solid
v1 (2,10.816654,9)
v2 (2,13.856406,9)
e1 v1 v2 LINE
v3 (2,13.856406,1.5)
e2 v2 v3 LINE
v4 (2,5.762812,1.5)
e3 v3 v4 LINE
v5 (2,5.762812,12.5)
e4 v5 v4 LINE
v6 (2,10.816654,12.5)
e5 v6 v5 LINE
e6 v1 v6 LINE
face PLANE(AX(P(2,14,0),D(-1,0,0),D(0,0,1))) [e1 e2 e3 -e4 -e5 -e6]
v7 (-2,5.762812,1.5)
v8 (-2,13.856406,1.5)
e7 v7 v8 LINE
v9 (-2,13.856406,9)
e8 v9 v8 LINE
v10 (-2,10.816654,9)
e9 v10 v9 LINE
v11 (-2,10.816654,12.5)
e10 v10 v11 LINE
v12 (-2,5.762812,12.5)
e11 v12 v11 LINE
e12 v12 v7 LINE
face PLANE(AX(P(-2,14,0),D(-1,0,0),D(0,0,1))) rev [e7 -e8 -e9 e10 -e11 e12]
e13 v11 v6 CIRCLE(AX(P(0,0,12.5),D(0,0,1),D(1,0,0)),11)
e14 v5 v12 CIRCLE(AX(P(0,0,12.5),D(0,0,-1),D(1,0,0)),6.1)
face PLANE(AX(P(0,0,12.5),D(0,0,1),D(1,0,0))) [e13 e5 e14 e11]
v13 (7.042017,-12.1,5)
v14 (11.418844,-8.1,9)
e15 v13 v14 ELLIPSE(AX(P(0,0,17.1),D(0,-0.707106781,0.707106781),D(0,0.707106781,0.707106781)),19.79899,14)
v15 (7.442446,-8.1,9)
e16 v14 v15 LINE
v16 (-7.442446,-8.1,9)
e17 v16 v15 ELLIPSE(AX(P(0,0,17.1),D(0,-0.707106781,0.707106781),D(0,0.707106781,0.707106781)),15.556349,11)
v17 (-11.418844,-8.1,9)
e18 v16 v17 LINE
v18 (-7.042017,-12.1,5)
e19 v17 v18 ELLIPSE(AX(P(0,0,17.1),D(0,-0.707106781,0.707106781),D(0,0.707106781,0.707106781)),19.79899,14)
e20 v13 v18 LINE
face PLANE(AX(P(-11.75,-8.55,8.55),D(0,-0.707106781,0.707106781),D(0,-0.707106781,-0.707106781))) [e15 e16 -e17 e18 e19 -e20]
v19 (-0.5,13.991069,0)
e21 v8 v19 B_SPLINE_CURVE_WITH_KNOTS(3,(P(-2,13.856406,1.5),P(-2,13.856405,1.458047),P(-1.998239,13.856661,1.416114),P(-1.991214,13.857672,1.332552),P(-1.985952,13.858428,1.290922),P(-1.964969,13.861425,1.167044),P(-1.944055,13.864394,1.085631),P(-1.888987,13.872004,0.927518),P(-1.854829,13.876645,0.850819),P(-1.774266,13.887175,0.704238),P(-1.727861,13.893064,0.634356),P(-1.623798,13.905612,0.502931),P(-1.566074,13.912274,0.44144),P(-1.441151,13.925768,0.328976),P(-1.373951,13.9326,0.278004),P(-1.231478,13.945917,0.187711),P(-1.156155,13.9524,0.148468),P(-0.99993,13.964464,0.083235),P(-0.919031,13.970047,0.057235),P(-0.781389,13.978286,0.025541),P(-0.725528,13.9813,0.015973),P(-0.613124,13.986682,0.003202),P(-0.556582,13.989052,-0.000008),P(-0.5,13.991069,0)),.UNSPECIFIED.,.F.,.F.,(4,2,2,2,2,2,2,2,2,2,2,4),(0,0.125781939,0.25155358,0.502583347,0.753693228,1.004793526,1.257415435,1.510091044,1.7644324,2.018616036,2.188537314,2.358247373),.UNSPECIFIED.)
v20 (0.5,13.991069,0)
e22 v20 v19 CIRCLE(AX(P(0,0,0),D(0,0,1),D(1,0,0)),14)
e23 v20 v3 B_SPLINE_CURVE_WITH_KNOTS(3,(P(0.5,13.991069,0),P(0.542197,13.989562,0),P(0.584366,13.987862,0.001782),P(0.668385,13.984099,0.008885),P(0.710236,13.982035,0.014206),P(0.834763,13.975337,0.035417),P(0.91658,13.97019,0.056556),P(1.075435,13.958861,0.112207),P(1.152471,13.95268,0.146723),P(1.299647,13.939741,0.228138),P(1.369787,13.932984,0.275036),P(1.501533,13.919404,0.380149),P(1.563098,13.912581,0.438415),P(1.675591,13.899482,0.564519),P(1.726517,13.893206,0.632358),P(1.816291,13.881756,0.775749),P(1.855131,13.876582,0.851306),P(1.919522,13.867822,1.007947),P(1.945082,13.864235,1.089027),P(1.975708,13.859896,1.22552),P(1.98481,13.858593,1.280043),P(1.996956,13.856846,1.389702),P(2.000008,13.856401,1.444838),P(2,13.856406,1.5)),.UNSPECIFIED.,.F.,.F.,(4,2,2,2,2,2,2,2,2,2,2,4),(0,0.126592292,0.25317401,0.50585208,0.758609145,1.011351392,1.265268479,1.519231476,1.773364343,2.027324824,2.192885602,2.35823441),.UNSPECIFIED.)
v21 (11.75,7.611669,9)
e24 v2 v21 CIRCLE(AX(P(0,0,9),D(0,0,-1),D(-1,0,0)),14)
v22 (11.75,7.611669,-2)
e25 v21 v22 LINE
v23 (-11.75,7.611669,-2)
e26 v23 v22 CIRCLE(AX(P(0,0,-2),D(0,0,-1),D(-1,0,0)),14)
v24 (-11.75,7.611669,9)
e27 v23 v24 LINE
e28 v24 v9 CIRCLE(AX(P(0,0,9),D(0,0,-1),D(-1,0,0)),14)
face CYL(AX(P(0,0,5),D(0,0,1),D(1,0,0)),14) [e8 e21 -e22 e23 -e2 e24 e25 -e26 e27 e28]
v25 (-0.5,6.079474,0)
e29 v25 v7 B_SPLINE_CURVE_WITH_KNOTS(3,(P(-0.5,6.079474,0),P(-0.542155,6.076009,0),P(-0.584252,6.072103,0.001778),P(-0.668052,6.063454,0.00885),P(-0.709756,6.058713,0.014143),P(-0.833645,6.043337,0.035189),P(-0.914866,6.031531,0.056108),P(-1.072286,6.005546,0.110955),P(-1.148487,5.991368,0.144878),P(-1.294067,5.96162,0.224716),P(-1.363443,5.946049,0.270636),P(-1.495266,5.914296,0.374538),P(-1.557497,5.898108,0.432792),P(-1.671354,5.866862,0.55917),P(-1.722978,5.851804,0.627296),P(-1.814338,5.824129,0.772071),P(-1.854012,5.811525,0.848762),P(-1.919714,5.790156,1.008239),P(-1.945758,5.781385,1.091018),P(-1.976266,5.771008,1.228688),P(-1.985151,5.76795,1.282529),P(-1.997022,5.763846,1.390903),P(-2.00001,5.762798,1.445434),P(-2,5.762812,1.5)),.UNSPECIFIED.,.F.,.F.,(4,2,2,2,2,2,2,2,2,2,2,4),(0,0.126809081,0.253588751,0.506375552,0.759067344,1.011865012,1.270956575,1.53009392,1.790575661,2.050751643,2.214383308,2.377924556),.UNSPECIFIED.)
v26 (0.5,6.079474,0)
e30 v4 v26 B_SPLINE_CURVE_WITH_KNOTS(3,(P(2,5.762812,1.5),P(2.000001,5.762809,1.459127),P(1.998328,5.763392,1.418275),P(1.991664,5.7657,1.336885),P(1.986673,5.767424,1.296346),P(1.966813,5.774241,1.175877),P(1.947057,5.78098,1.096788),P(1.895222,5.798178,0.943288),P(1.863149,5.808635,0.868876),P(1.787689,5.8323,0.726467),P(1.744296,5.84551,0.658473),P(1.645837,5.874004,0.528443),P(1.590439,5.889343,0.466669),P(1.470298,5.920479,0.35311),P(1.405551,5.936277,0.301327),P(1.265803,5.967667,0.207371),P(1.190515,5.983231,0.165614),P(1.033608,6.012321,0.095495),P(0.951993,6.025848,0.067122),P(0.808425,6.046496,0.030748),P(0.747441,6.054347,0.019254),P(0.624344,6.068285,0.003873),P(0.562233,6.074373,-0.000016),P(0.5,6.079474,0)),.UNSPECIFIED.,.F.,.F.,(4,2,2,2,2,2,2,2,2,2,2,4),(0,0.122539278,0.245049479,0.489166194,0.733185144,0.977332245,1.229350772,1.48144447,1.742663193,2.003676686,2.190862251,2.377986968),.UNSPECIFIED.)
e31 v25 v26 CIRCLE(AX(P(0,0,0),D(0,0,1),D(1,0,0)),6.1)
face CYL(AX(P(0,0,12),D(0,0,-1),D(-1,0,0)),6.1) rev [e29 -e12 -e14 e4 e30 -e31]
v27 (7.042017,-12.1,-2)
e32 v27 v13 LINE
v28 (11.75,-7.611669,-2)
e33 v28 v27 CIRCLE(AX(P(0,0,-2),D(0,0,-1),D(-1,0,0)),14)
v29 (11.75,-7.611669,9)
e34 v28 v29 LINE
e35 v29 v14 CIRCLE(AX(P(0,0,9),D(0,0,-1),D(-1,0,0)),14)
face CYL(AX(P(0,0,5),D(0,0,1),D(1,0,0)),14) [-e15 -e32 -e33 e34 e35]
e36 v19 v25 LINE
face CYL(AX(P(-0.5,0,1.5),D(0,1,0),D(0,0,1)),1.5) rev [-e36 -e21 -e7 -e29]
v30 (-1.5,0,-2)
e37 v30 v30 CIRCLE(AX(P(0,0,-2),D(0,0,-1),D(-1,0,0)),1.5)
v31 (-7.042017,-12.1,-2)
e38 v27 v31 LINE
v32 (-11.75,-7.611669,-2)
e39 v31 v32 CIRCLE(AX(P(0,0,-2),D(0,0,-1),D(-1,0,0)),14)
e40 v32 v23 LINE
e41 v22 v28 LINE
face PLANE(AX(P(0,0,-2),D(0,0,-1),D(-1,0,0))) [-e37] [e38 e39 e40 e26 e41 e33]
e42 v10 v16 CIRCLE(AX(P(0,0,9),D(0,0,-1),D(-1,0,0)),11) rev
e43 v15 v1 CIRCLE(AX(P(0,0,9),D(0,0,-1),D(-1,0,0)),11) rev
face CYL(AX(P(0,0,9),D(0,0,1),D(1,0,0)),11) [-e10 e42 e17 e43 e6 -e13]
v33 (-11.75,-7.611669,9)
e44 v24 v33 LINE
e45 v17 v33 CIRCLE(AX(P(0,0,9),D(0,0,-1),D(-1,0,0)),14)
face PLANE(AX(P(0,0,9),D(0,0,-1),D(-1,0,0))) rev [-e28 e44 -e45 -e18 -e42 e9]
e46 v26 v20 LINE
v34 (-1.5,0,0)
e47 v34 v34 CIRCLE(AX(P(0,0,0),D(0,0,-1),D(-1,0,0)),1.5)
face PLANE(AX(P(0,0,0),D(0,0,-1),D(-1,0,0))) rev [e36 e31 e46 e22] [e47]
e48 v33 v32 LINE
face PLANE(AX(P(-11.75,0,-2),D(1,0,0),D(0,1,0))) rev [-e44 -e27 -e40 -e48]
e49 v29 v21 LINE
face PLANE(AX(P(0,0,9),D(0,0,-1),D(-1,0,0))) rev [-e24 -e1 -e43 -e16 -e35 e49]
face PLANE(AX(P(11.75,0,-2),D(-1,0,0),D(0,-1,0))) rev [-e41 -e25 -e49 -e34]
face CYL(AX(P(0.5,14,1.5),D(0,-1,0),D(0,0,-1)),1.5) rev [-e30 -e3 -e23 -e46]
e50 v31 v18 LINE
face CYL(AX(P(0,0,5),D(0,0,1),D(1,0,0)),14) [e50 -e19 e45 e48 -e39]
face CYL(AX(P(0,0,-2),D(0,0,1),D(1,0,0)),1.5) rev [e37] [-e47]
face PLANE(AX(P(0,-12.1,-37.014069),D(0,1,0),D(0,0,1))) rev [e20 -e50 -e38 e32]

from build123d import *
from build123d.topology import SkipClean

# Parameters (mm, degrees)
SKETCH1_R               = 9.1
SKETCH1_R_2             = 6.1
BOSS_EXTRUDE1_DEPTH     = 12
BOSS_EXTRUDE2_START     = -3
SKETCH2_R               = 11
SKETCH2_R_2             = 9.1
BOSS_EXTRUDE2_DEPTH     = 3
BOSS_EXTRUDE3_START     = 4
SKETCH3_R               = 14
SKETCH3_R_2             = 11
SKETCH3_R_3             = 9.1
BOSS_EXTRUDE3_DEPTH     = 4
BOSS_EXTRUDE4_START     = 2
SKETCH4_R               = 9.1
SKETCH4_R_2             = 1.5
BOSS_EXTRUDE4_DEPTH     = 2
CUT_EXTRUDE3_DEPTH      = 23.649503306
CUT_EXTRUDE3_DEPTH_BACK = 23.649503306
SKETCH5_W               = 4
SKETCH5_H               = 12
CUT_EXTRUDE1_DEPTH      = 22.864640404
CUT_EXTRUDE4_DEPTH      = 22.864640404
CUT_EXTRUDE4_DEPTH_BACK = 22.864640404
SKETCH7_W               = 8
SKETCH7_H               = 10
BOSS_EXTRUDE5_START     = -14
SKETCH2_2_R             = 11
SKETCH2_2_R_2           = 9.1
SKETCH2_2_R_3           = 6.1
BOSS_EXTRUDE5_DEPTH     = 14
BOSS_EXTRUDE6_START     = 7
BOSS_EXTRUDE6_DEPTH     = 7
CUT_EXTRUDE5_START      = 5.762811814
CUT_EXTRUDE5_OUTLINE_W  = 4
CUT_EXTRUDE5_OUTLINE_H  = 12
CUT_EXTRUDE5_DEPTH      = 5.237188186
BOSS_EXTRUDE7_START     = -2
SKETCH11_R              = 14
SKETCH11_R_2            = 1.5
BOSS_EXTRUDE7_DEPTH     = 2
CUT_EXTRUDE6_DEPTH      = 24.151673806
CUT_EXTRUDE6_DEPTH_BACK = 24.151673806
FILLET1_R               = 1.5
BOSS_EXTRUDE8_DEPTH     = 0.5


# Read off the part's stored shape, not the designer's step: Cut-Extrude5
with BuildPart() as part:
    # Sketch1 → Boss-Extrude1 (new body)
    with BuildSketch(Plane.XY):
        Circle(SKETCH1_R)
        Circle(SKETCH1_R_2, mode=Mode.SUBTRACT)
    extrude(amount=BOSS_EXTRUDE1_DEPTH)

    # Sketch2 → Boss-Extrude2 (add)
    with BuildSketch(Plane.XY.offset(12).offset(BOSS_EXTRUDE2_START)):
        Circle(SKETCH2_R)
        Circle(SKETCH2_R_2, mode=Mode.SUBTRACT)
    extrude(amount=BOSS_EXTRUDE2_DEPTH)

    # Sketch3 → Boss-Extrude3 (add)
    # profile 1 of 2: a face of its own
    with BuildSketch(Plane(origin=(0, 0, 9), x_dir=(-1, 0, 0), z_dir=(0, 0, -1)).offset(BOSS_EXTRUDE3_START)):
        Circle(SKETCH3_R)
        with Locations(Location((0, 0, 0), (0, 0, 180))):
            Circle(SKETCH3_R_2, mode=Mode.SUBTRACT)
    # profile 2 of 2: a face of its own
    with BuildSketch(Plane(origin=(0, 0, 9), x_dir=(-1, 0, 0), z_dir=(0, 0, -1)).offset(BOSS_EXTRUDE3_START)):
        with Locations(Location((0, 0, 0), (0, 0, 180))):
            Circle(SKETCH3_R_2)
        Circle(SKETCH3_R_3, mode=Mode.SUBTRACT)
    extrude(amount=-BOSS_EXTRUDE3_DEPTH)

    # Sketch4 → Boss-Extrude4 (add)
    with BuildSketch(Plane(origin=(0, 0, 0), x_dir=(-1, 0, 0), z_dir=(0, 0, -1)).offset(BOSS_EXTRUDE4_START)):
        Circle(SKETCH4_R)
        Circle(SKETCH4_R_2, mode=Mode.SUBTRACT)
    extrude(amount=-BOSS_EXTRUDE4_DEPTH)

    # Sketch6 → Cut-Extrude3 (cut, two sides: drawn at the far end of the back side and taken through both)
    with BuildSketch(Plane.XY.offset(9).offset(-CUT_EXTRUDE3_DEPTH_BACK)):
        with BuildLine():
            ThreePointArc((11.75, -7.611668674), (14, 0), (11.75, 7.611668674))
            Line((11.75, 7.611668674), (11.75, -7.611668674))
        make_face()
        with BuildLine():
            Line((-11.75, -7.611668674), (-11.75, 7.611668674))
            ThreePointArc((-11.75, 7.611668674), (-14, 0), (-11.75, -7.611668674))
        make_face()
    extrude(amount=CUT_EXTRUDE3_DEPTH + CUT_EXTRUDE3_DEPTH_BACK, mode=Mode.SUBTRACT)

    # Sketch5 → Cut-Extrude1 (cut, through all)
    with BuildSketch(Plane(origin=(0, 0, 0), x_dir=(1, 0, 0), z_dir=(0, 1, 0))):
        with Locations((0, -6)):
            Rectangle(SKETCH5_W, SKETCH5_H)
    extrude(amount=CUT_EXTRUDE1_DEPTH, mode=Mode.SUBTRACT)

    # Sketch7 → Cut-Extrude4 (cut, two sides: drawn at the far end of the back side and taken through both)
    with BuildSketch(Plane(origin=(0, 0, 0), x_dir=(0, 0, -1), z_dir=(1, 0, 0)).offset(-CUT_EXTRUDE4_DEPTH_BACK)):
        with Locations((-8, -18.1)):
            Rectangle(SKETCH7_W, SKETCH7_H)
        Polygon((-12, -13.1), (-12, -6.1), (-12, -5.1), (-4, -13.1), align=None)
    extrude(amount=CUT_EXTRUDE4_DEPTH + CUT_EXTRUDE4_DEPTH_BACK, mode=Mode.SUBTRACT)

    # Sketch2<2> → Boss-Extrude5 (add)
    # profile 1 of 2: a face of its own
    with BuildSketch(Plane.XY.offset(12).offset(BOSS_EXTRUDE5_START)):
        Circle(SKETCH2_2_R)
        Circle(SKETCH2_2_R_2, mode=Mode.SUBTRACT)
    # profile 2 of 2: a face of its own
    with BuildSketch(Plane.XY.offset(12).offset(BOSS_EXTRUDE5_START)):
        Circle(SKETCH2_2_R_2)
        Circle(SKETCH2_2_R_3, mode=Mode.SUBTRACT)
    extrude(amount=BOSS_EXTRUDE5_DEPTH)

    # Sketch10 → Boss-Extrude6 (add)
    with BuildSketch(Plane(origin=(0, 0, 5), x_dir=(-1, 0, 0), z_dir=(0, 0, -1)).offset(BOSS_EXTRUDE6_START)):
        with BuildLine():
            Line((2, 13.856406461), (2, 10.816653826))
            ThreePointArc((2, 10.816653826), (0, -11), (-2, 10.816653826))
            Line((-2, 10.816653826), (-2, 13.856406461))
            ThreePointArc((-2, 13.856406461), (-7.550815354, 11.789197916), (-11.75, 7.611668674))
            Line((-11.75, 7.611668674), (-11.75, -7.611668674))
            ThreePointArc((-11.75, -7.611668674), (-9.660292592, -10.133052207), (-7.042016757, -12.1))
            Line((-7.042016757, -12.1), (7.042016757, -12.1))
            ThreePointArc((7.042016757, -12.1), (9.660292592, -10.133052207), (11.75, -7.611668674))
            Line((11.75, -7.611668674), (11.75, 7.611668674))
            ThreePointArc((11.75, 7.611668674), (7.550815354, 11.789197916), (2, 13.856406461))
        make_face()
    extrude(amount=-BOSS_EXTRUDE6_DEPTH)

    # Cut-Extrude5 outline → Cut-Extrude5 (cut)
    with BuildSketch(Plane(origin=(0, 0, 0), x_dir=(1, 0, 0), z_dir=(0, 1, 0)).offset(CUT_EXTRUDE5_START)):
        with Locations((0, -6)):
            Rectangle(CUT_EXTRUDE5_OUTLINE_W, CUT_EXTRUDE5_OUTLINE_H)
    extrude(amount=CUT_EXTRUDE5_DEPTH, mode=Mode.SUBTRACT)

    # Sketch11 → Boss-Extrude7 (add)
    with SkipClean():  # the faces are left unmerged after this step: merging them gives an invalid solid
        with BuildSketch(Plane.XY.offset(BOSS_EXTRUDE7_START)):
            with Locations(Location((0, 0, 0), (0, 0, 327.064769503))):
                Circle(SKETCH11_R)
            with Locations(Location((0, 0, 0), (0, 0, 180))):
                Circle(SKETCH11_R_2, mode=Mode.SUBTRACT)
        extrude(amount=BOSS_EXTRUDE7_DEPTH)

    # Sketch12 → Cut-Extrude6 (cut, two sides: drawn at the far end of the back side and taken through both)
    with SkipClean():  # the faces are left unmerged after this step: merging them gives an invalid solid
        with BuildSketch(Plane.XY.offset(-CUT_EXTRUDE6_DEPTH_BACK)):
            with BuildLine():
                Line((11.75, 7.611668674), (11.75, -7.611668674))
                ThreePointArc((11.75, -7.611668674), (14, 0), (11.75, 7.611668674))
            make_face()
            with BuildLine():
                Line((-11.75, -7.611668674), (-11.75, 7.611668674))
                ThreePointArc((-11.75, 7.611668674), (-14, 0), (-11.75, -7.611668674))
            make_face()
            with BuildLine():
                Line((7.042016757, -12.1), (-7.042016757, -12.1))
                ThreePointArc((-7.042016757, -12.1), (0, -14), (7.042016757, -12.1))
            make_face()
        extrude(amount=CUT_EXTRUDE6_DEPTH + CUT_EXTRUDE6_DEPTH_BACK, mode=Mode.SUBTRACT)

    # Fillet1
    # the kernel refuses this fillet: 1.5 mm, written as the material it adds along each edge
    with BuildSketch(Plane(origin=(-2, 2.012811814, 0), x_dir=(0, 0, 1), z_dir=(0, 1, 0))) as fillet1_piece_1_section:
        with BuildLine():
            CenterArc((FILLET1_R, FILLET1_R), FILLET1_R, 180, 90)
            Line((0, FILLET1_R), (0, 0))
            Line((0, 0), (FILLET1_R, 0))
        make_face()
    fillet1_piece_1 = extrude(amount=8.803842012, mode=Mode.PRIVATE)
    fillet1_piece_1 = fillet1_piece_1 - Plane(origin=(0, 0, 0.34289743), x_dir=(1, 0, 0), z_dir=(0, 0, -1)) * Cylinder(6.1, 24, mode=Mode.PRIVATE)
    add(fillet1_piece_1)
    with BuildSketch(Plane(origin=(2, 2.012811814, 0), x_dir=(0, 0, 1), z_dir=(0, 1, 0))) as fillet1_piece_2_section:
        with BuildLine():
            CenterArc((FILLET1_R, -FILLET1_R), FILLET1_R, 90, 90)
            Line((0, -FILLET1_R), (0, 0))
            Line((0, 0), (FILLET1_R, 0))
        make_face()
    fillet1_piece_2 = extrude(amount=8.803842012, mode=Mode.PRIVATE)
    fillet1_piece_2 = fillet1_piece_2 - Plane(origin=(0, 0, 0.342899139), x_dir=(1, 0, 0), z_dir=(0, 0, -1)) * Cylinder(6.1, 24, mode=Mode.PRIVATE)
    add(fillet1_piece_2)
    with BuildSketch(Plane(origin=(2, 10.816653826, 0), x_dir=(0, 0, 1), z_dir=(0, 1, 0))) as fillet1_piece_3_section:
        with BuildLine():
            CenterArc((FILLET1_R, -FILLET1_R), FILLET1_R, 90, 90)
            Line((0, -FILLET1_R), (0, 0))
            Line((0, 0), (FILLET1_R, 0))
        make_face()
    fillet1_piece_3 = extrude(amount=6.789752634, mode=Mode.PRIVATE)
    fillet1_piece_3 = fillet1_piece_3 & Plane(origin=(0, 0, 0.337347522), x_dir=(-1, 0, 0), z_dir=(0, 0, -1)) * Cylinder(14, 20, mode=Mode.PRIVATE)
    add(fillet1_piece_3)
    with BuildSketch(Plane(origin=(-2, 17.606406461, 0), x_dir=(0, 0, 1), z_dir=(0, -1, 0))) as fillet1_piece_4_section:
        with BuildLine():
            CenterArc((FILLET1_R, -FILLET1_R), FILLET1_R, 90, 90)
            Line((0, -FILLET1_R), (0, 0))
            Line((0, 0), (FILLET1_R, 0))
        make_face()
    fillet1_piece_4 = extrude(amount=6.789752634, mode=Mode.PRIVATE)
    fillet1_piece_4 = fillet1_piece_4 & Plane(origin=(0, 0, 0.337344923), x_dir=(-0.8392857142857146, 0.5436906195585112, 0), z_dir=(0, 0, -1)) * Cylinder(14, 20, mode=Mode.PRIVATE)
    add(fillet1_piece_4)

    # Sketch13 → Boss-Extrude8 (add)
    with BuildSketch(Plane.XY.offset(12)):
        with BuildLine():
            Line((-2, 5.762811814), (-2, 10.816653826))
            ThreePointArc((-2, 10.816653826), (0, -11), (2, 10.816653826))
            Line((2, 10.816653826), (2, 5.762811814))
            ThreePointArc((2, 5.762811814), (0, -6.1), (-2, 5.762811814))
        make_face()
    extrude(amount=BOSS_EXTRUDE8_DEPTH)


solid = part.part
